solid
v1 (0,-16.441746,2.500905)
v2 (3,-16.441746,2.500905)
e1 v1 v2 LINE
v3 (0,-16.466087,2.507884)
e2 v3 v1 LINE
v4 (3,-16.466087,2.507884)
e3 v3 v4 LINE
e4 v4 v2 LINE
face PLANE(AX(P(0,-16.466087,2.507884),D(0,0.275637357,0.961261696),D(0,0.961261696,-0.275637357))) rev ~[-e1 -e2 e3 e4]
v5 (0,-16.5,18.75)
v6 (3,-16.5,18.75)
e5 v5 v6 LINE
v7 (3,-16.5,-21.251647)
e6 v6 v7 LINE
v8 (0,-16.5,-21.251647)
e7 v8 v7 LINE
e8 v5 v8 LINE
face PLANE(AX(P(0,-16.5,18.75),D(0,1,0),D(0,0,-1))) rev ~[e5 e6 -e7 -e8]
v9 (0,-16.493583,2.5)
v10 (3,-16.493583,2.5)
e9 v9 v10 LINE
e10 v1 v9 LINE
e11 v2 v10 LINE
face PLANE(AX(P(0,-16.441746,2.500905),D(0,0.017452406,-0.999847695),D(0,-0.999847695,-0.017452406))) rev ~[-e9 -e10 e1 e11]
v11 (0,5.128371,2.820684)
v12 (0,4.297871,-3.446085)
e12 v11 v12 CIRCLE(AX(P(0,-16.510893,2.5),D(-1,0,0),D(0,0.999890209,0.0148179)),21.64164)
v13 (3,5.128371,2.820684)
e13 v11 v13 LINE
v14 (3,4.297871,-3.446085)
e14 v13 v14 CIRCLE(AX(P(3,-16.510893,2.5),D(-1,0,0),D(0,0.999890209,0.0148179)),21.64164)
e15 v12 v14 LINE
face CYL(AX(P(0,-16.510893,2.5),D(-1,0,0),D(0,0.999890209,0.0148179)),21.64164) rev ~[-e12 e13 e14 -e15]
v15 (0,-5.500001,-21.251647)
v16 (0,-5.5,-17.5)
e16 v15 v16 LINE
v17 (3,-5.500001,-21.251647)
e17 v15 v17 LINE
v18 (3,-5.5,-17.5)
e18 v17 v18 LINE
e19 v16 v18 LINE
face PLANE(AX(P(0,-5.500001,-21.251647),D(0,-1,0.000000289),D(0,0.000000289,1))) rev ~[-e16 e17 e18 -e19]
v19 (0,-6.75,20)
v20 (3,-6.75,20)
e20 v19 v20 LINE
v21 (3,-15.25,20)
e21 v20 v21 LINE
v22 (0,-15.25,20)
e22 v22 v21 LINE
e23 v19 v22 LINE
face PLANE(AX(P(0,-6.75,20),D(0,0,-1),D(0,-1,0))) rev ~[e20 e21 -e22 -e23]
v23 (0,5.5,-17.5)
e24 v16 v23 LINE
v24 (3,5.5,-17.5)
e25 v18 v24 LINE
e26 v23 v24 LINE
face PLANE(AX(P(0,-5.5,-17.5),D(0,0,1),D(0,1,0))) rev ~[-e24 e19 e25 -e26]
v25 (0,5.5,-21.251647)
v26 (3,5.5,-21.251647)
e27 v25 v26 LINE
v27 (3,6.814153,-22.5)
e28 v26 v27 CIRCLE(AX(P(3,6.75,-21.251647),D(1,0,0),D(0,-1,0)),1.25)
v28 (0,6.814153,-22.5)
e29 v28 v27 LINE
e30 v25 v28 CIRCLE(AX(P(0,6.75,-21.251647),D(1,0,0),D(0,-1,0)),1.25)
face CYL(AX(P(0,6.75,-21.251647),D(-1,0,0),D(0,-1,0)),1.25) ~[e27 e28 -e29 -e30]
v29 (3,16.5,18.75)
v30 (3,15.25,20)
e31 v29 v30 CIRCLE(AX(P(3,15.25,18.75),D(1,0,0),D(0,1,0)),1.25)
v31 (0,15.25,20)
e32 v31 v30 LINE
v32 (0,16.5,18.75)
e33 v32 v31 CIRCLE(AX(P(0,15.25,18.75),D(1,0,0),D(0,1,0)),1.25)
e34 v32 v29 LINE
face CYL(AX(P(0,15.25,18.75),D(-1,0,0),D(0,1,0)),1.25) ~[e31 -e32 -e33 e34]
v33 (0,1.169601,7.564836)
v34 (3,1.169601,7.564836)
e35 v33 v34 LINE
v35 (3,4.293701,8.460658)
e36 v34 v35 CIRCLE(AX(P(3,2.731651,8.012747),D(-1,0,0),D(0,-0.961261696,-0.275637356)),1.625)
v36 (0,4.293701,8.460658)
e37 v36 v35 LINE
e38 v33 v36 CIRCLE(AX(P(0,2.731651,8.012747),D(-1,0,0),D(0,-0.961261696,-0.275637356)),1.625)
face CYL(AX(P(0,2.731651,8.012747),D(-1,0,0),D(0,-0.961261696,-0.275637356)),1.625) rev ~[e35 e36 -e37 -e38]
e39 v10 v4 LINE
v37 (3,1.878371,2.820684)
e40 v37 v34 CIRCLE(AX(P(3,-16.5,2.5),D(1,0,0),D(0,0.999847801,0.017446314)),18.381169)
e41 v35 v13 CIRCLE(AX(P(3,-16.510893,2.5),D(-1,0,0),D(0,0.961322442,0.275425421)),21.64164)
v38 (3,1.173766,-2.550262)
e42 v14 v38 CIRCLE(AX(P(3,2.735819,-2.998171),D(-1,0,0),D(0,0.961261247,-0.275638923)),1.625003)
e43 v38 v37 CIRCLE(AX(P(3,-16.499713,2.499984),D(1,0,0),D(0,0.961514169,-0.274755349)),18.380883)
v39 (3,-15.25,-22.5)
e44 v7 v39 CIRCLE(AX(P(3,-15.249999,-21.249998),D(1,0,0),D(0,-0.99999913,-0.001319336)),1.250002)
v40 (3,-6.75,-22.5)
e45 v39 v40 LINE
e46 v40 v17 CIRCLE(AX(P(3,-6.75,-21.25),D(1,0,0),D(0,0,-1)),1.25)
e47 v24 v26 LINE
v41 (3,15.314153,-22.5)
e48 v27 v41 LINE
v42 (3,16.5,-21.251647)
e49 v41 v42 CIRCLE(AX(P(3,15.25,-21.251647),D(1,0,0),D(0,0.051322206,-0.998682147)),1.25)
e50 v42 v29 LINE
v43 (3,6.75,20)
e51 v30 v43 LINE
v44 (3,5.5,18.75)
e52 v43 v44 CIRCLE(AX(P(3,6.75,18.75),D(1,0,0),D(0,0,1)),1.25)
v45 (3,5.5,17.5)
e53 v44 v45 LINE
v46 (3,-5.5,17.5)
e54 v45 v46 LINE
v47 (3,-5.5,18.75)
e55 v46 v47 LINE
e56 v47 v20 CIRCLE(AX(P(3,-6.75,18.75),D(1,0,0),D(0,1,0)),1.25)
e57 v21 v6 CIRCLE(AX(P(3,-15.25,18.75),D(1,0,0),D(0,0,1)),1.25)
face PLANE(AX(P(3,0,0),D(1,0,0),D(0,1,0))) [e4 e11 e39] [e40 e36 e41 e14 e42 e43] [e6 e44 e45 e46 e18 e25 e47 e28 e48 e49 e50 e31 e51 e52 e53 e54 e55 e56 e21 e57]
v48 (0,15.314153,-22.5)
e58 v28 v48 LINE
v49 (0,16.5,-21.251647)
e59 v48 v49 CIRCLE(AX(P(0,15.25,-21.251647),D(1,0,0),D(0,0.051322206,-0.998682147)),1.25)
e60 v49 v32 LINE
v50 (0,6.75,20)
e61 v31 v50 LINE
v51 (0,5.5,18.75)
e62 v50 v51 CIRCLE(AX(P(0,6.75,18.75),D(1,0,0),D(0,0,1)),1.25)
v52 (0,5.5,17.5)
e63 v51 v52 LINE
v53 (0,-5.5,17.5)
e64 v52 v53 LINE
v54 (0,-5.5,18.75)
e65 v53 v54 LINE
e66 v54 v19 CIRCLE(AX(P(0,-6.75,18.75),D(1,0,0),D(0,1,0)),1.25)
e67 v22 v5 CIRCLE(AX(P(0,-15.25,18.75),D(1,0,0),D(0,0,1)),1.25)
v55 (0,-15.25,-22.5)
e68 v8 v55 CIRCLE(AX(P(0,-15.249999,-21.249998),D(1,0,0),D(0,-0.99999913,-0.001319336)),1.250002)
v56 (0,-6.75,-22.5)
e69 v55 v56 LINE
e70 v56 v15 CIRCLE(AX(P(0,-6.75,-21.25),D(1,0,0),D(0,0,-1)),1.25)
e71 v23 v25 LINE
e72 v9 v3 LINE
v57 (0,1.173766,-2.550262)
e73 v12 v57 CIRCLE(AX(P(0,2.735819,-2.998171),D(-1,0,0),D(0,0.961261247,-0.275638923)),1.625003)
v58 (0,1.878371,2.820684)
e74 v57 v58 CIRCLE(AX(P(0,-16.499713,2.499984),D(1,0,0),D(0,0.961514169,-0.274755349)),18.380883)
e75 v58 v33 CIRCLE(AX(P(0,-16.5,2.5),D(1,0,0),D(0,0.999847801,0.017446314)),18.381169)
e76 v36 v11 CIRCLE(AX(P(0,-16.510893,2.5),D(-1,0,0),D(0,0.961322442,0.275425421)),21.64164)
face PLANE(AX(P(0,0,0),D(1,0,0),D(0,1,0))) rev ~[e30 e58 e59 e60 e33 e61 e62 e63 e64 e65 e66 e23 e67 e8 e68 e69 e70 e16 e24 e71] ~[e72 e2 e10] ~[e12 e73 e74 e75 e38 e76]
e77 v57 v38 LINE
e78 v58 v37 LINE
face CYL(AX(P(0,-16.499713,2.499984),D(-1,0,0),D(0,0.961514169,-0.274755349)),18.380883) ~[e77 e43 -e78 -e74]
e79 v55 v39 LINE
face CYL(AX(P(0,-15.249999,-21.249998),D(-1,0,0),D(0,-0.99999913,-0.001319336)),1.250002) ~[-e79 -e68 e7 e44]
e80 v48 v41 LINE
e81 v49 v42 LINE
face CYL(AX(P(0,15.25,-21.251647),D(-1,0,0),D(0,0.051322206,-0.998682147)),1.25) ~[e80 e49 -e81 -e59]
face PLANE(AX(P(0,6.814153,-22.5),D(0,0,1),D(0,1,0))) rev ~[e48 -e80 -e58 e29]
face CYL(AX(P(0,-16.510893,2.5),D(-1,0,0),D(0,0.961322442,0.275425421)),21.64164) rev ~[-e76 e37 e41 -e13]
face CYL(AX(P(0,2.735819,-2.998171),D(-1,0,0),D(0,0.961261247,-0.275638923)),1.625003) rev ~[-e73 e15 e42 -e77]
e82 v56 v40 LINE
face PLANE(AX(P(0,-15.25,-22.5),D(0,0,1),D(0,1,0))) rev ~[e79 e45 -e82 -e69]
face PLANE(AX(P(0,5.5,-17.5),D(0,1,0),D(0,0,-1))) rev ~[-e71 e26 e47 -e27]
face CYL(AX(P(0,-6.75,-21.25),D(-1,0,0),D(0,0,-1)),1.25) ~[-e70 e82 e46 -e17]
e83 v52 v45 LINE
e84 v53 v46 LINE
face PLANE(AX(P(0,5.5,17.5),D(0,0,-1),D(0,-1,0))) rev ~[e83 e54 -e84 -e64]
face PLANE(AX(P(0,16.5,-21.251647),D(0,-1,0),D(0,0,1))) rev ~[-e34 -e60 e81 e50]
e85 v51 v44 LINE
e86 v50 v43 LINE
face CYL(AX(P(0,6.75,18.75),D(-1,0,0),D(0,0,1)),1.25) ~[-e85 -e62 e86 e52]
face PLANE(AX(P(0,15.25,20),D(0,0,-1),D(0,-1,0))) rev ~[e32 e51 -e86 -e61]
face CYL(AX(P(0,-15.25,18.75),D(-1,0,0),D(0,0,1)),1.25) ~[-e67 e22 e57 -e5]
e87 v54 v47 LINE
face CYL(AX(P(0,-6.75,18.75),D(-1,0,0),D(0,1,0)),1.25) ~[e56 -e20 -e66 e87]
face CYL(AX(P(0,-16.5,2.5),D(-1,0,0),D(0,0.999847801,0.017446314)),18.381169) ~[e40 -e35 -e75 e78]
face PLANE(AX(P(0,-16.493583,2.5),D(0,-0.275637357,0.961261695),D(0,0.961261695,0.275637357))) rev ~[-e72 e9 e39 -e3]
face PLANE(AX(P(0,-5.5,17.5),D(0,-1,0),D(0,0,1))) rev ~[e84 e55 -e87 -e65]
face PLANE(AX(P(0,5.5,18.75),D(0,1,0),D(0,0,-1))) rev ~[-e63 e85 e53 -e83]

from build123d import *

# Parameters (mm, degrees)
F1_DEPTH = 3


# Not quite as in the source:
# - ends of sketch curves that miss each other by under 0.0002 mm in the source are joined


with BuildPart() as f1:
    # F0 (on Right) → F1 (new body)
    with BuildSketch(Plane.YZ):
        Polygon((5.5, 17.5), (-5.5, 17.5), (-16.5, 17.5), (-16.5, -17.5), (-5.5, -17.5), (5.5, -17.5), (16.5, -17.5), (16.5, 17.5), align=None)
        with BuildLine():
            Line((-16.4417464987, 2.5009048043), (-16.4935827024, 2.5))
            Line((-16.4935827024, 2.5), (-16.4660868868, 2.5078842983))
            Line((-16.4660868868, 2.5078842983), (1.1696009604, 7.5648364131))
            ThreePointArc((1.1696009604, 7.5648364131), (2.2837405131, 9.5747973722), (4.2937014722, 8.4606578195))
            ThreePointArc((4.2937014722, 8.4606578195), (4.8975775667, 5.6682772997), (5.1283712007, 2.8206836482))
            ThreePointArc((5.1283712007, 2.8206836482), (4.9431713186, -0.3431878735), (4.2978712002, -3.4460848682))
            ThreePointArc((4.2978712002, -3.4460848682), (2.2879051371, -4.5602229624), (1.1737655844, -2.5502620033))
            Line((1.1737655844, -2.5502620033), (-16.4417464987, 2.5009048043))
        make_face(mode=Mode.SUBTRACT)
        with BuildLine():
            Line((-5.5, -17.5), (-16.5, -17.5))
            Line((-16.5, -17.5), (-16.5, -21.2516473165))
            ThreePointArc((-16.5, -21.2516473165), (-16.1333008707, -22.1344656985), (-15.25, -22.5))
            Line((-15.25, -22.5), (-6.75, -22.5))
            ThreePointArc((-6.75, -22.5), (-5.8666991293, -22.1344656985), (-5.5000010855, -21.251647315))
            Line((-5.5000010855, -21.251647315), (-5.5, -17.5))
        make_face()
        with BuildLine():
            Line((16.5, -21.2516473165), (16.5, -17.5))
            Line((16.5, -17.5), (5.5, -17.5))
            Line((5.5, -17.5), (5.5, -21.251647316))
            ThreePointArc((5.5, -21.251647316), (5.8890966799, -22.1579284387), (6.8141527576, -22.5))
            Line((6.8141527576, -22.5), (15.3141527576, -22.5))
            ThreePointArc((15.3141527576, -22.5), (16.1562811226, -22.1125506362), (16.5, -21.2516473165))
        make_face()
        with BuildLine():
            Line((5.5, 18.75), (5.5, 17.5))
            Line((5.5, 17.5), (16.5, 17.5))
            Line((16.5, 17.5), (16.5, 18.75))
            ThreePointArc((16.5, 18.75), (16.1338834765, 19.6338834765), (15.25, 20))
            Line((15.25, 20), (6.75, 20))
            ThreePointArc((6.75, 20), (5.8661165235, 19.6338834765), (5.5, 18.75))
        make_face()
        with BuildLine():
            Line((-16.5, 17.5), (-5.5, 17.5))
            Line((-5.5, 17.5), (-5.5, 18.75))
            ThreePointArc((-5.5, 18.75), (-5.8661165235, 19.6338834765), (-6.75, 20))
            Line((-6.75, 20), (-15.25, 20))
            ThreePointArc((-15.25, 20), (-16.1338834765, 19.6338834765), (-16.5, 18.75))
            Line((-16.5, 18.75), (-16.5, 17.5))
        make_face()
        with BuildLine():
            Line((-16.4660868868, 2.5078842983), (-16.4417464987, 2.5009048043))
            Line((-16.4417464987, 2.5009048043), (1.8783712007, 2.8206836482))
            ThreePointArc((1.8783712007, 2.8206836482), (1.6794064974, 5.2159796384), (1.1696009604, 7.5648364131))
            Line((1.1696009604, 7.5648364131), (-16.4660868868, 2.5078842983))
        make_face()
        with BuildLine():
            Line((1.8783712007, 2.8206836482), (-16.4417464987, 2.5009048043))
            Line((-16.4417464987, 2.5009048043), (1.1737655844, -2.5502620033))
            ThreePointArc((1.1737655844, -2.5502620033), (1.7250108073, 0.1091116575), (1.8783712007, 2.8206836482))
        make_face()
    extrude(amount=F1_DEPTH)


solid = f1.part
